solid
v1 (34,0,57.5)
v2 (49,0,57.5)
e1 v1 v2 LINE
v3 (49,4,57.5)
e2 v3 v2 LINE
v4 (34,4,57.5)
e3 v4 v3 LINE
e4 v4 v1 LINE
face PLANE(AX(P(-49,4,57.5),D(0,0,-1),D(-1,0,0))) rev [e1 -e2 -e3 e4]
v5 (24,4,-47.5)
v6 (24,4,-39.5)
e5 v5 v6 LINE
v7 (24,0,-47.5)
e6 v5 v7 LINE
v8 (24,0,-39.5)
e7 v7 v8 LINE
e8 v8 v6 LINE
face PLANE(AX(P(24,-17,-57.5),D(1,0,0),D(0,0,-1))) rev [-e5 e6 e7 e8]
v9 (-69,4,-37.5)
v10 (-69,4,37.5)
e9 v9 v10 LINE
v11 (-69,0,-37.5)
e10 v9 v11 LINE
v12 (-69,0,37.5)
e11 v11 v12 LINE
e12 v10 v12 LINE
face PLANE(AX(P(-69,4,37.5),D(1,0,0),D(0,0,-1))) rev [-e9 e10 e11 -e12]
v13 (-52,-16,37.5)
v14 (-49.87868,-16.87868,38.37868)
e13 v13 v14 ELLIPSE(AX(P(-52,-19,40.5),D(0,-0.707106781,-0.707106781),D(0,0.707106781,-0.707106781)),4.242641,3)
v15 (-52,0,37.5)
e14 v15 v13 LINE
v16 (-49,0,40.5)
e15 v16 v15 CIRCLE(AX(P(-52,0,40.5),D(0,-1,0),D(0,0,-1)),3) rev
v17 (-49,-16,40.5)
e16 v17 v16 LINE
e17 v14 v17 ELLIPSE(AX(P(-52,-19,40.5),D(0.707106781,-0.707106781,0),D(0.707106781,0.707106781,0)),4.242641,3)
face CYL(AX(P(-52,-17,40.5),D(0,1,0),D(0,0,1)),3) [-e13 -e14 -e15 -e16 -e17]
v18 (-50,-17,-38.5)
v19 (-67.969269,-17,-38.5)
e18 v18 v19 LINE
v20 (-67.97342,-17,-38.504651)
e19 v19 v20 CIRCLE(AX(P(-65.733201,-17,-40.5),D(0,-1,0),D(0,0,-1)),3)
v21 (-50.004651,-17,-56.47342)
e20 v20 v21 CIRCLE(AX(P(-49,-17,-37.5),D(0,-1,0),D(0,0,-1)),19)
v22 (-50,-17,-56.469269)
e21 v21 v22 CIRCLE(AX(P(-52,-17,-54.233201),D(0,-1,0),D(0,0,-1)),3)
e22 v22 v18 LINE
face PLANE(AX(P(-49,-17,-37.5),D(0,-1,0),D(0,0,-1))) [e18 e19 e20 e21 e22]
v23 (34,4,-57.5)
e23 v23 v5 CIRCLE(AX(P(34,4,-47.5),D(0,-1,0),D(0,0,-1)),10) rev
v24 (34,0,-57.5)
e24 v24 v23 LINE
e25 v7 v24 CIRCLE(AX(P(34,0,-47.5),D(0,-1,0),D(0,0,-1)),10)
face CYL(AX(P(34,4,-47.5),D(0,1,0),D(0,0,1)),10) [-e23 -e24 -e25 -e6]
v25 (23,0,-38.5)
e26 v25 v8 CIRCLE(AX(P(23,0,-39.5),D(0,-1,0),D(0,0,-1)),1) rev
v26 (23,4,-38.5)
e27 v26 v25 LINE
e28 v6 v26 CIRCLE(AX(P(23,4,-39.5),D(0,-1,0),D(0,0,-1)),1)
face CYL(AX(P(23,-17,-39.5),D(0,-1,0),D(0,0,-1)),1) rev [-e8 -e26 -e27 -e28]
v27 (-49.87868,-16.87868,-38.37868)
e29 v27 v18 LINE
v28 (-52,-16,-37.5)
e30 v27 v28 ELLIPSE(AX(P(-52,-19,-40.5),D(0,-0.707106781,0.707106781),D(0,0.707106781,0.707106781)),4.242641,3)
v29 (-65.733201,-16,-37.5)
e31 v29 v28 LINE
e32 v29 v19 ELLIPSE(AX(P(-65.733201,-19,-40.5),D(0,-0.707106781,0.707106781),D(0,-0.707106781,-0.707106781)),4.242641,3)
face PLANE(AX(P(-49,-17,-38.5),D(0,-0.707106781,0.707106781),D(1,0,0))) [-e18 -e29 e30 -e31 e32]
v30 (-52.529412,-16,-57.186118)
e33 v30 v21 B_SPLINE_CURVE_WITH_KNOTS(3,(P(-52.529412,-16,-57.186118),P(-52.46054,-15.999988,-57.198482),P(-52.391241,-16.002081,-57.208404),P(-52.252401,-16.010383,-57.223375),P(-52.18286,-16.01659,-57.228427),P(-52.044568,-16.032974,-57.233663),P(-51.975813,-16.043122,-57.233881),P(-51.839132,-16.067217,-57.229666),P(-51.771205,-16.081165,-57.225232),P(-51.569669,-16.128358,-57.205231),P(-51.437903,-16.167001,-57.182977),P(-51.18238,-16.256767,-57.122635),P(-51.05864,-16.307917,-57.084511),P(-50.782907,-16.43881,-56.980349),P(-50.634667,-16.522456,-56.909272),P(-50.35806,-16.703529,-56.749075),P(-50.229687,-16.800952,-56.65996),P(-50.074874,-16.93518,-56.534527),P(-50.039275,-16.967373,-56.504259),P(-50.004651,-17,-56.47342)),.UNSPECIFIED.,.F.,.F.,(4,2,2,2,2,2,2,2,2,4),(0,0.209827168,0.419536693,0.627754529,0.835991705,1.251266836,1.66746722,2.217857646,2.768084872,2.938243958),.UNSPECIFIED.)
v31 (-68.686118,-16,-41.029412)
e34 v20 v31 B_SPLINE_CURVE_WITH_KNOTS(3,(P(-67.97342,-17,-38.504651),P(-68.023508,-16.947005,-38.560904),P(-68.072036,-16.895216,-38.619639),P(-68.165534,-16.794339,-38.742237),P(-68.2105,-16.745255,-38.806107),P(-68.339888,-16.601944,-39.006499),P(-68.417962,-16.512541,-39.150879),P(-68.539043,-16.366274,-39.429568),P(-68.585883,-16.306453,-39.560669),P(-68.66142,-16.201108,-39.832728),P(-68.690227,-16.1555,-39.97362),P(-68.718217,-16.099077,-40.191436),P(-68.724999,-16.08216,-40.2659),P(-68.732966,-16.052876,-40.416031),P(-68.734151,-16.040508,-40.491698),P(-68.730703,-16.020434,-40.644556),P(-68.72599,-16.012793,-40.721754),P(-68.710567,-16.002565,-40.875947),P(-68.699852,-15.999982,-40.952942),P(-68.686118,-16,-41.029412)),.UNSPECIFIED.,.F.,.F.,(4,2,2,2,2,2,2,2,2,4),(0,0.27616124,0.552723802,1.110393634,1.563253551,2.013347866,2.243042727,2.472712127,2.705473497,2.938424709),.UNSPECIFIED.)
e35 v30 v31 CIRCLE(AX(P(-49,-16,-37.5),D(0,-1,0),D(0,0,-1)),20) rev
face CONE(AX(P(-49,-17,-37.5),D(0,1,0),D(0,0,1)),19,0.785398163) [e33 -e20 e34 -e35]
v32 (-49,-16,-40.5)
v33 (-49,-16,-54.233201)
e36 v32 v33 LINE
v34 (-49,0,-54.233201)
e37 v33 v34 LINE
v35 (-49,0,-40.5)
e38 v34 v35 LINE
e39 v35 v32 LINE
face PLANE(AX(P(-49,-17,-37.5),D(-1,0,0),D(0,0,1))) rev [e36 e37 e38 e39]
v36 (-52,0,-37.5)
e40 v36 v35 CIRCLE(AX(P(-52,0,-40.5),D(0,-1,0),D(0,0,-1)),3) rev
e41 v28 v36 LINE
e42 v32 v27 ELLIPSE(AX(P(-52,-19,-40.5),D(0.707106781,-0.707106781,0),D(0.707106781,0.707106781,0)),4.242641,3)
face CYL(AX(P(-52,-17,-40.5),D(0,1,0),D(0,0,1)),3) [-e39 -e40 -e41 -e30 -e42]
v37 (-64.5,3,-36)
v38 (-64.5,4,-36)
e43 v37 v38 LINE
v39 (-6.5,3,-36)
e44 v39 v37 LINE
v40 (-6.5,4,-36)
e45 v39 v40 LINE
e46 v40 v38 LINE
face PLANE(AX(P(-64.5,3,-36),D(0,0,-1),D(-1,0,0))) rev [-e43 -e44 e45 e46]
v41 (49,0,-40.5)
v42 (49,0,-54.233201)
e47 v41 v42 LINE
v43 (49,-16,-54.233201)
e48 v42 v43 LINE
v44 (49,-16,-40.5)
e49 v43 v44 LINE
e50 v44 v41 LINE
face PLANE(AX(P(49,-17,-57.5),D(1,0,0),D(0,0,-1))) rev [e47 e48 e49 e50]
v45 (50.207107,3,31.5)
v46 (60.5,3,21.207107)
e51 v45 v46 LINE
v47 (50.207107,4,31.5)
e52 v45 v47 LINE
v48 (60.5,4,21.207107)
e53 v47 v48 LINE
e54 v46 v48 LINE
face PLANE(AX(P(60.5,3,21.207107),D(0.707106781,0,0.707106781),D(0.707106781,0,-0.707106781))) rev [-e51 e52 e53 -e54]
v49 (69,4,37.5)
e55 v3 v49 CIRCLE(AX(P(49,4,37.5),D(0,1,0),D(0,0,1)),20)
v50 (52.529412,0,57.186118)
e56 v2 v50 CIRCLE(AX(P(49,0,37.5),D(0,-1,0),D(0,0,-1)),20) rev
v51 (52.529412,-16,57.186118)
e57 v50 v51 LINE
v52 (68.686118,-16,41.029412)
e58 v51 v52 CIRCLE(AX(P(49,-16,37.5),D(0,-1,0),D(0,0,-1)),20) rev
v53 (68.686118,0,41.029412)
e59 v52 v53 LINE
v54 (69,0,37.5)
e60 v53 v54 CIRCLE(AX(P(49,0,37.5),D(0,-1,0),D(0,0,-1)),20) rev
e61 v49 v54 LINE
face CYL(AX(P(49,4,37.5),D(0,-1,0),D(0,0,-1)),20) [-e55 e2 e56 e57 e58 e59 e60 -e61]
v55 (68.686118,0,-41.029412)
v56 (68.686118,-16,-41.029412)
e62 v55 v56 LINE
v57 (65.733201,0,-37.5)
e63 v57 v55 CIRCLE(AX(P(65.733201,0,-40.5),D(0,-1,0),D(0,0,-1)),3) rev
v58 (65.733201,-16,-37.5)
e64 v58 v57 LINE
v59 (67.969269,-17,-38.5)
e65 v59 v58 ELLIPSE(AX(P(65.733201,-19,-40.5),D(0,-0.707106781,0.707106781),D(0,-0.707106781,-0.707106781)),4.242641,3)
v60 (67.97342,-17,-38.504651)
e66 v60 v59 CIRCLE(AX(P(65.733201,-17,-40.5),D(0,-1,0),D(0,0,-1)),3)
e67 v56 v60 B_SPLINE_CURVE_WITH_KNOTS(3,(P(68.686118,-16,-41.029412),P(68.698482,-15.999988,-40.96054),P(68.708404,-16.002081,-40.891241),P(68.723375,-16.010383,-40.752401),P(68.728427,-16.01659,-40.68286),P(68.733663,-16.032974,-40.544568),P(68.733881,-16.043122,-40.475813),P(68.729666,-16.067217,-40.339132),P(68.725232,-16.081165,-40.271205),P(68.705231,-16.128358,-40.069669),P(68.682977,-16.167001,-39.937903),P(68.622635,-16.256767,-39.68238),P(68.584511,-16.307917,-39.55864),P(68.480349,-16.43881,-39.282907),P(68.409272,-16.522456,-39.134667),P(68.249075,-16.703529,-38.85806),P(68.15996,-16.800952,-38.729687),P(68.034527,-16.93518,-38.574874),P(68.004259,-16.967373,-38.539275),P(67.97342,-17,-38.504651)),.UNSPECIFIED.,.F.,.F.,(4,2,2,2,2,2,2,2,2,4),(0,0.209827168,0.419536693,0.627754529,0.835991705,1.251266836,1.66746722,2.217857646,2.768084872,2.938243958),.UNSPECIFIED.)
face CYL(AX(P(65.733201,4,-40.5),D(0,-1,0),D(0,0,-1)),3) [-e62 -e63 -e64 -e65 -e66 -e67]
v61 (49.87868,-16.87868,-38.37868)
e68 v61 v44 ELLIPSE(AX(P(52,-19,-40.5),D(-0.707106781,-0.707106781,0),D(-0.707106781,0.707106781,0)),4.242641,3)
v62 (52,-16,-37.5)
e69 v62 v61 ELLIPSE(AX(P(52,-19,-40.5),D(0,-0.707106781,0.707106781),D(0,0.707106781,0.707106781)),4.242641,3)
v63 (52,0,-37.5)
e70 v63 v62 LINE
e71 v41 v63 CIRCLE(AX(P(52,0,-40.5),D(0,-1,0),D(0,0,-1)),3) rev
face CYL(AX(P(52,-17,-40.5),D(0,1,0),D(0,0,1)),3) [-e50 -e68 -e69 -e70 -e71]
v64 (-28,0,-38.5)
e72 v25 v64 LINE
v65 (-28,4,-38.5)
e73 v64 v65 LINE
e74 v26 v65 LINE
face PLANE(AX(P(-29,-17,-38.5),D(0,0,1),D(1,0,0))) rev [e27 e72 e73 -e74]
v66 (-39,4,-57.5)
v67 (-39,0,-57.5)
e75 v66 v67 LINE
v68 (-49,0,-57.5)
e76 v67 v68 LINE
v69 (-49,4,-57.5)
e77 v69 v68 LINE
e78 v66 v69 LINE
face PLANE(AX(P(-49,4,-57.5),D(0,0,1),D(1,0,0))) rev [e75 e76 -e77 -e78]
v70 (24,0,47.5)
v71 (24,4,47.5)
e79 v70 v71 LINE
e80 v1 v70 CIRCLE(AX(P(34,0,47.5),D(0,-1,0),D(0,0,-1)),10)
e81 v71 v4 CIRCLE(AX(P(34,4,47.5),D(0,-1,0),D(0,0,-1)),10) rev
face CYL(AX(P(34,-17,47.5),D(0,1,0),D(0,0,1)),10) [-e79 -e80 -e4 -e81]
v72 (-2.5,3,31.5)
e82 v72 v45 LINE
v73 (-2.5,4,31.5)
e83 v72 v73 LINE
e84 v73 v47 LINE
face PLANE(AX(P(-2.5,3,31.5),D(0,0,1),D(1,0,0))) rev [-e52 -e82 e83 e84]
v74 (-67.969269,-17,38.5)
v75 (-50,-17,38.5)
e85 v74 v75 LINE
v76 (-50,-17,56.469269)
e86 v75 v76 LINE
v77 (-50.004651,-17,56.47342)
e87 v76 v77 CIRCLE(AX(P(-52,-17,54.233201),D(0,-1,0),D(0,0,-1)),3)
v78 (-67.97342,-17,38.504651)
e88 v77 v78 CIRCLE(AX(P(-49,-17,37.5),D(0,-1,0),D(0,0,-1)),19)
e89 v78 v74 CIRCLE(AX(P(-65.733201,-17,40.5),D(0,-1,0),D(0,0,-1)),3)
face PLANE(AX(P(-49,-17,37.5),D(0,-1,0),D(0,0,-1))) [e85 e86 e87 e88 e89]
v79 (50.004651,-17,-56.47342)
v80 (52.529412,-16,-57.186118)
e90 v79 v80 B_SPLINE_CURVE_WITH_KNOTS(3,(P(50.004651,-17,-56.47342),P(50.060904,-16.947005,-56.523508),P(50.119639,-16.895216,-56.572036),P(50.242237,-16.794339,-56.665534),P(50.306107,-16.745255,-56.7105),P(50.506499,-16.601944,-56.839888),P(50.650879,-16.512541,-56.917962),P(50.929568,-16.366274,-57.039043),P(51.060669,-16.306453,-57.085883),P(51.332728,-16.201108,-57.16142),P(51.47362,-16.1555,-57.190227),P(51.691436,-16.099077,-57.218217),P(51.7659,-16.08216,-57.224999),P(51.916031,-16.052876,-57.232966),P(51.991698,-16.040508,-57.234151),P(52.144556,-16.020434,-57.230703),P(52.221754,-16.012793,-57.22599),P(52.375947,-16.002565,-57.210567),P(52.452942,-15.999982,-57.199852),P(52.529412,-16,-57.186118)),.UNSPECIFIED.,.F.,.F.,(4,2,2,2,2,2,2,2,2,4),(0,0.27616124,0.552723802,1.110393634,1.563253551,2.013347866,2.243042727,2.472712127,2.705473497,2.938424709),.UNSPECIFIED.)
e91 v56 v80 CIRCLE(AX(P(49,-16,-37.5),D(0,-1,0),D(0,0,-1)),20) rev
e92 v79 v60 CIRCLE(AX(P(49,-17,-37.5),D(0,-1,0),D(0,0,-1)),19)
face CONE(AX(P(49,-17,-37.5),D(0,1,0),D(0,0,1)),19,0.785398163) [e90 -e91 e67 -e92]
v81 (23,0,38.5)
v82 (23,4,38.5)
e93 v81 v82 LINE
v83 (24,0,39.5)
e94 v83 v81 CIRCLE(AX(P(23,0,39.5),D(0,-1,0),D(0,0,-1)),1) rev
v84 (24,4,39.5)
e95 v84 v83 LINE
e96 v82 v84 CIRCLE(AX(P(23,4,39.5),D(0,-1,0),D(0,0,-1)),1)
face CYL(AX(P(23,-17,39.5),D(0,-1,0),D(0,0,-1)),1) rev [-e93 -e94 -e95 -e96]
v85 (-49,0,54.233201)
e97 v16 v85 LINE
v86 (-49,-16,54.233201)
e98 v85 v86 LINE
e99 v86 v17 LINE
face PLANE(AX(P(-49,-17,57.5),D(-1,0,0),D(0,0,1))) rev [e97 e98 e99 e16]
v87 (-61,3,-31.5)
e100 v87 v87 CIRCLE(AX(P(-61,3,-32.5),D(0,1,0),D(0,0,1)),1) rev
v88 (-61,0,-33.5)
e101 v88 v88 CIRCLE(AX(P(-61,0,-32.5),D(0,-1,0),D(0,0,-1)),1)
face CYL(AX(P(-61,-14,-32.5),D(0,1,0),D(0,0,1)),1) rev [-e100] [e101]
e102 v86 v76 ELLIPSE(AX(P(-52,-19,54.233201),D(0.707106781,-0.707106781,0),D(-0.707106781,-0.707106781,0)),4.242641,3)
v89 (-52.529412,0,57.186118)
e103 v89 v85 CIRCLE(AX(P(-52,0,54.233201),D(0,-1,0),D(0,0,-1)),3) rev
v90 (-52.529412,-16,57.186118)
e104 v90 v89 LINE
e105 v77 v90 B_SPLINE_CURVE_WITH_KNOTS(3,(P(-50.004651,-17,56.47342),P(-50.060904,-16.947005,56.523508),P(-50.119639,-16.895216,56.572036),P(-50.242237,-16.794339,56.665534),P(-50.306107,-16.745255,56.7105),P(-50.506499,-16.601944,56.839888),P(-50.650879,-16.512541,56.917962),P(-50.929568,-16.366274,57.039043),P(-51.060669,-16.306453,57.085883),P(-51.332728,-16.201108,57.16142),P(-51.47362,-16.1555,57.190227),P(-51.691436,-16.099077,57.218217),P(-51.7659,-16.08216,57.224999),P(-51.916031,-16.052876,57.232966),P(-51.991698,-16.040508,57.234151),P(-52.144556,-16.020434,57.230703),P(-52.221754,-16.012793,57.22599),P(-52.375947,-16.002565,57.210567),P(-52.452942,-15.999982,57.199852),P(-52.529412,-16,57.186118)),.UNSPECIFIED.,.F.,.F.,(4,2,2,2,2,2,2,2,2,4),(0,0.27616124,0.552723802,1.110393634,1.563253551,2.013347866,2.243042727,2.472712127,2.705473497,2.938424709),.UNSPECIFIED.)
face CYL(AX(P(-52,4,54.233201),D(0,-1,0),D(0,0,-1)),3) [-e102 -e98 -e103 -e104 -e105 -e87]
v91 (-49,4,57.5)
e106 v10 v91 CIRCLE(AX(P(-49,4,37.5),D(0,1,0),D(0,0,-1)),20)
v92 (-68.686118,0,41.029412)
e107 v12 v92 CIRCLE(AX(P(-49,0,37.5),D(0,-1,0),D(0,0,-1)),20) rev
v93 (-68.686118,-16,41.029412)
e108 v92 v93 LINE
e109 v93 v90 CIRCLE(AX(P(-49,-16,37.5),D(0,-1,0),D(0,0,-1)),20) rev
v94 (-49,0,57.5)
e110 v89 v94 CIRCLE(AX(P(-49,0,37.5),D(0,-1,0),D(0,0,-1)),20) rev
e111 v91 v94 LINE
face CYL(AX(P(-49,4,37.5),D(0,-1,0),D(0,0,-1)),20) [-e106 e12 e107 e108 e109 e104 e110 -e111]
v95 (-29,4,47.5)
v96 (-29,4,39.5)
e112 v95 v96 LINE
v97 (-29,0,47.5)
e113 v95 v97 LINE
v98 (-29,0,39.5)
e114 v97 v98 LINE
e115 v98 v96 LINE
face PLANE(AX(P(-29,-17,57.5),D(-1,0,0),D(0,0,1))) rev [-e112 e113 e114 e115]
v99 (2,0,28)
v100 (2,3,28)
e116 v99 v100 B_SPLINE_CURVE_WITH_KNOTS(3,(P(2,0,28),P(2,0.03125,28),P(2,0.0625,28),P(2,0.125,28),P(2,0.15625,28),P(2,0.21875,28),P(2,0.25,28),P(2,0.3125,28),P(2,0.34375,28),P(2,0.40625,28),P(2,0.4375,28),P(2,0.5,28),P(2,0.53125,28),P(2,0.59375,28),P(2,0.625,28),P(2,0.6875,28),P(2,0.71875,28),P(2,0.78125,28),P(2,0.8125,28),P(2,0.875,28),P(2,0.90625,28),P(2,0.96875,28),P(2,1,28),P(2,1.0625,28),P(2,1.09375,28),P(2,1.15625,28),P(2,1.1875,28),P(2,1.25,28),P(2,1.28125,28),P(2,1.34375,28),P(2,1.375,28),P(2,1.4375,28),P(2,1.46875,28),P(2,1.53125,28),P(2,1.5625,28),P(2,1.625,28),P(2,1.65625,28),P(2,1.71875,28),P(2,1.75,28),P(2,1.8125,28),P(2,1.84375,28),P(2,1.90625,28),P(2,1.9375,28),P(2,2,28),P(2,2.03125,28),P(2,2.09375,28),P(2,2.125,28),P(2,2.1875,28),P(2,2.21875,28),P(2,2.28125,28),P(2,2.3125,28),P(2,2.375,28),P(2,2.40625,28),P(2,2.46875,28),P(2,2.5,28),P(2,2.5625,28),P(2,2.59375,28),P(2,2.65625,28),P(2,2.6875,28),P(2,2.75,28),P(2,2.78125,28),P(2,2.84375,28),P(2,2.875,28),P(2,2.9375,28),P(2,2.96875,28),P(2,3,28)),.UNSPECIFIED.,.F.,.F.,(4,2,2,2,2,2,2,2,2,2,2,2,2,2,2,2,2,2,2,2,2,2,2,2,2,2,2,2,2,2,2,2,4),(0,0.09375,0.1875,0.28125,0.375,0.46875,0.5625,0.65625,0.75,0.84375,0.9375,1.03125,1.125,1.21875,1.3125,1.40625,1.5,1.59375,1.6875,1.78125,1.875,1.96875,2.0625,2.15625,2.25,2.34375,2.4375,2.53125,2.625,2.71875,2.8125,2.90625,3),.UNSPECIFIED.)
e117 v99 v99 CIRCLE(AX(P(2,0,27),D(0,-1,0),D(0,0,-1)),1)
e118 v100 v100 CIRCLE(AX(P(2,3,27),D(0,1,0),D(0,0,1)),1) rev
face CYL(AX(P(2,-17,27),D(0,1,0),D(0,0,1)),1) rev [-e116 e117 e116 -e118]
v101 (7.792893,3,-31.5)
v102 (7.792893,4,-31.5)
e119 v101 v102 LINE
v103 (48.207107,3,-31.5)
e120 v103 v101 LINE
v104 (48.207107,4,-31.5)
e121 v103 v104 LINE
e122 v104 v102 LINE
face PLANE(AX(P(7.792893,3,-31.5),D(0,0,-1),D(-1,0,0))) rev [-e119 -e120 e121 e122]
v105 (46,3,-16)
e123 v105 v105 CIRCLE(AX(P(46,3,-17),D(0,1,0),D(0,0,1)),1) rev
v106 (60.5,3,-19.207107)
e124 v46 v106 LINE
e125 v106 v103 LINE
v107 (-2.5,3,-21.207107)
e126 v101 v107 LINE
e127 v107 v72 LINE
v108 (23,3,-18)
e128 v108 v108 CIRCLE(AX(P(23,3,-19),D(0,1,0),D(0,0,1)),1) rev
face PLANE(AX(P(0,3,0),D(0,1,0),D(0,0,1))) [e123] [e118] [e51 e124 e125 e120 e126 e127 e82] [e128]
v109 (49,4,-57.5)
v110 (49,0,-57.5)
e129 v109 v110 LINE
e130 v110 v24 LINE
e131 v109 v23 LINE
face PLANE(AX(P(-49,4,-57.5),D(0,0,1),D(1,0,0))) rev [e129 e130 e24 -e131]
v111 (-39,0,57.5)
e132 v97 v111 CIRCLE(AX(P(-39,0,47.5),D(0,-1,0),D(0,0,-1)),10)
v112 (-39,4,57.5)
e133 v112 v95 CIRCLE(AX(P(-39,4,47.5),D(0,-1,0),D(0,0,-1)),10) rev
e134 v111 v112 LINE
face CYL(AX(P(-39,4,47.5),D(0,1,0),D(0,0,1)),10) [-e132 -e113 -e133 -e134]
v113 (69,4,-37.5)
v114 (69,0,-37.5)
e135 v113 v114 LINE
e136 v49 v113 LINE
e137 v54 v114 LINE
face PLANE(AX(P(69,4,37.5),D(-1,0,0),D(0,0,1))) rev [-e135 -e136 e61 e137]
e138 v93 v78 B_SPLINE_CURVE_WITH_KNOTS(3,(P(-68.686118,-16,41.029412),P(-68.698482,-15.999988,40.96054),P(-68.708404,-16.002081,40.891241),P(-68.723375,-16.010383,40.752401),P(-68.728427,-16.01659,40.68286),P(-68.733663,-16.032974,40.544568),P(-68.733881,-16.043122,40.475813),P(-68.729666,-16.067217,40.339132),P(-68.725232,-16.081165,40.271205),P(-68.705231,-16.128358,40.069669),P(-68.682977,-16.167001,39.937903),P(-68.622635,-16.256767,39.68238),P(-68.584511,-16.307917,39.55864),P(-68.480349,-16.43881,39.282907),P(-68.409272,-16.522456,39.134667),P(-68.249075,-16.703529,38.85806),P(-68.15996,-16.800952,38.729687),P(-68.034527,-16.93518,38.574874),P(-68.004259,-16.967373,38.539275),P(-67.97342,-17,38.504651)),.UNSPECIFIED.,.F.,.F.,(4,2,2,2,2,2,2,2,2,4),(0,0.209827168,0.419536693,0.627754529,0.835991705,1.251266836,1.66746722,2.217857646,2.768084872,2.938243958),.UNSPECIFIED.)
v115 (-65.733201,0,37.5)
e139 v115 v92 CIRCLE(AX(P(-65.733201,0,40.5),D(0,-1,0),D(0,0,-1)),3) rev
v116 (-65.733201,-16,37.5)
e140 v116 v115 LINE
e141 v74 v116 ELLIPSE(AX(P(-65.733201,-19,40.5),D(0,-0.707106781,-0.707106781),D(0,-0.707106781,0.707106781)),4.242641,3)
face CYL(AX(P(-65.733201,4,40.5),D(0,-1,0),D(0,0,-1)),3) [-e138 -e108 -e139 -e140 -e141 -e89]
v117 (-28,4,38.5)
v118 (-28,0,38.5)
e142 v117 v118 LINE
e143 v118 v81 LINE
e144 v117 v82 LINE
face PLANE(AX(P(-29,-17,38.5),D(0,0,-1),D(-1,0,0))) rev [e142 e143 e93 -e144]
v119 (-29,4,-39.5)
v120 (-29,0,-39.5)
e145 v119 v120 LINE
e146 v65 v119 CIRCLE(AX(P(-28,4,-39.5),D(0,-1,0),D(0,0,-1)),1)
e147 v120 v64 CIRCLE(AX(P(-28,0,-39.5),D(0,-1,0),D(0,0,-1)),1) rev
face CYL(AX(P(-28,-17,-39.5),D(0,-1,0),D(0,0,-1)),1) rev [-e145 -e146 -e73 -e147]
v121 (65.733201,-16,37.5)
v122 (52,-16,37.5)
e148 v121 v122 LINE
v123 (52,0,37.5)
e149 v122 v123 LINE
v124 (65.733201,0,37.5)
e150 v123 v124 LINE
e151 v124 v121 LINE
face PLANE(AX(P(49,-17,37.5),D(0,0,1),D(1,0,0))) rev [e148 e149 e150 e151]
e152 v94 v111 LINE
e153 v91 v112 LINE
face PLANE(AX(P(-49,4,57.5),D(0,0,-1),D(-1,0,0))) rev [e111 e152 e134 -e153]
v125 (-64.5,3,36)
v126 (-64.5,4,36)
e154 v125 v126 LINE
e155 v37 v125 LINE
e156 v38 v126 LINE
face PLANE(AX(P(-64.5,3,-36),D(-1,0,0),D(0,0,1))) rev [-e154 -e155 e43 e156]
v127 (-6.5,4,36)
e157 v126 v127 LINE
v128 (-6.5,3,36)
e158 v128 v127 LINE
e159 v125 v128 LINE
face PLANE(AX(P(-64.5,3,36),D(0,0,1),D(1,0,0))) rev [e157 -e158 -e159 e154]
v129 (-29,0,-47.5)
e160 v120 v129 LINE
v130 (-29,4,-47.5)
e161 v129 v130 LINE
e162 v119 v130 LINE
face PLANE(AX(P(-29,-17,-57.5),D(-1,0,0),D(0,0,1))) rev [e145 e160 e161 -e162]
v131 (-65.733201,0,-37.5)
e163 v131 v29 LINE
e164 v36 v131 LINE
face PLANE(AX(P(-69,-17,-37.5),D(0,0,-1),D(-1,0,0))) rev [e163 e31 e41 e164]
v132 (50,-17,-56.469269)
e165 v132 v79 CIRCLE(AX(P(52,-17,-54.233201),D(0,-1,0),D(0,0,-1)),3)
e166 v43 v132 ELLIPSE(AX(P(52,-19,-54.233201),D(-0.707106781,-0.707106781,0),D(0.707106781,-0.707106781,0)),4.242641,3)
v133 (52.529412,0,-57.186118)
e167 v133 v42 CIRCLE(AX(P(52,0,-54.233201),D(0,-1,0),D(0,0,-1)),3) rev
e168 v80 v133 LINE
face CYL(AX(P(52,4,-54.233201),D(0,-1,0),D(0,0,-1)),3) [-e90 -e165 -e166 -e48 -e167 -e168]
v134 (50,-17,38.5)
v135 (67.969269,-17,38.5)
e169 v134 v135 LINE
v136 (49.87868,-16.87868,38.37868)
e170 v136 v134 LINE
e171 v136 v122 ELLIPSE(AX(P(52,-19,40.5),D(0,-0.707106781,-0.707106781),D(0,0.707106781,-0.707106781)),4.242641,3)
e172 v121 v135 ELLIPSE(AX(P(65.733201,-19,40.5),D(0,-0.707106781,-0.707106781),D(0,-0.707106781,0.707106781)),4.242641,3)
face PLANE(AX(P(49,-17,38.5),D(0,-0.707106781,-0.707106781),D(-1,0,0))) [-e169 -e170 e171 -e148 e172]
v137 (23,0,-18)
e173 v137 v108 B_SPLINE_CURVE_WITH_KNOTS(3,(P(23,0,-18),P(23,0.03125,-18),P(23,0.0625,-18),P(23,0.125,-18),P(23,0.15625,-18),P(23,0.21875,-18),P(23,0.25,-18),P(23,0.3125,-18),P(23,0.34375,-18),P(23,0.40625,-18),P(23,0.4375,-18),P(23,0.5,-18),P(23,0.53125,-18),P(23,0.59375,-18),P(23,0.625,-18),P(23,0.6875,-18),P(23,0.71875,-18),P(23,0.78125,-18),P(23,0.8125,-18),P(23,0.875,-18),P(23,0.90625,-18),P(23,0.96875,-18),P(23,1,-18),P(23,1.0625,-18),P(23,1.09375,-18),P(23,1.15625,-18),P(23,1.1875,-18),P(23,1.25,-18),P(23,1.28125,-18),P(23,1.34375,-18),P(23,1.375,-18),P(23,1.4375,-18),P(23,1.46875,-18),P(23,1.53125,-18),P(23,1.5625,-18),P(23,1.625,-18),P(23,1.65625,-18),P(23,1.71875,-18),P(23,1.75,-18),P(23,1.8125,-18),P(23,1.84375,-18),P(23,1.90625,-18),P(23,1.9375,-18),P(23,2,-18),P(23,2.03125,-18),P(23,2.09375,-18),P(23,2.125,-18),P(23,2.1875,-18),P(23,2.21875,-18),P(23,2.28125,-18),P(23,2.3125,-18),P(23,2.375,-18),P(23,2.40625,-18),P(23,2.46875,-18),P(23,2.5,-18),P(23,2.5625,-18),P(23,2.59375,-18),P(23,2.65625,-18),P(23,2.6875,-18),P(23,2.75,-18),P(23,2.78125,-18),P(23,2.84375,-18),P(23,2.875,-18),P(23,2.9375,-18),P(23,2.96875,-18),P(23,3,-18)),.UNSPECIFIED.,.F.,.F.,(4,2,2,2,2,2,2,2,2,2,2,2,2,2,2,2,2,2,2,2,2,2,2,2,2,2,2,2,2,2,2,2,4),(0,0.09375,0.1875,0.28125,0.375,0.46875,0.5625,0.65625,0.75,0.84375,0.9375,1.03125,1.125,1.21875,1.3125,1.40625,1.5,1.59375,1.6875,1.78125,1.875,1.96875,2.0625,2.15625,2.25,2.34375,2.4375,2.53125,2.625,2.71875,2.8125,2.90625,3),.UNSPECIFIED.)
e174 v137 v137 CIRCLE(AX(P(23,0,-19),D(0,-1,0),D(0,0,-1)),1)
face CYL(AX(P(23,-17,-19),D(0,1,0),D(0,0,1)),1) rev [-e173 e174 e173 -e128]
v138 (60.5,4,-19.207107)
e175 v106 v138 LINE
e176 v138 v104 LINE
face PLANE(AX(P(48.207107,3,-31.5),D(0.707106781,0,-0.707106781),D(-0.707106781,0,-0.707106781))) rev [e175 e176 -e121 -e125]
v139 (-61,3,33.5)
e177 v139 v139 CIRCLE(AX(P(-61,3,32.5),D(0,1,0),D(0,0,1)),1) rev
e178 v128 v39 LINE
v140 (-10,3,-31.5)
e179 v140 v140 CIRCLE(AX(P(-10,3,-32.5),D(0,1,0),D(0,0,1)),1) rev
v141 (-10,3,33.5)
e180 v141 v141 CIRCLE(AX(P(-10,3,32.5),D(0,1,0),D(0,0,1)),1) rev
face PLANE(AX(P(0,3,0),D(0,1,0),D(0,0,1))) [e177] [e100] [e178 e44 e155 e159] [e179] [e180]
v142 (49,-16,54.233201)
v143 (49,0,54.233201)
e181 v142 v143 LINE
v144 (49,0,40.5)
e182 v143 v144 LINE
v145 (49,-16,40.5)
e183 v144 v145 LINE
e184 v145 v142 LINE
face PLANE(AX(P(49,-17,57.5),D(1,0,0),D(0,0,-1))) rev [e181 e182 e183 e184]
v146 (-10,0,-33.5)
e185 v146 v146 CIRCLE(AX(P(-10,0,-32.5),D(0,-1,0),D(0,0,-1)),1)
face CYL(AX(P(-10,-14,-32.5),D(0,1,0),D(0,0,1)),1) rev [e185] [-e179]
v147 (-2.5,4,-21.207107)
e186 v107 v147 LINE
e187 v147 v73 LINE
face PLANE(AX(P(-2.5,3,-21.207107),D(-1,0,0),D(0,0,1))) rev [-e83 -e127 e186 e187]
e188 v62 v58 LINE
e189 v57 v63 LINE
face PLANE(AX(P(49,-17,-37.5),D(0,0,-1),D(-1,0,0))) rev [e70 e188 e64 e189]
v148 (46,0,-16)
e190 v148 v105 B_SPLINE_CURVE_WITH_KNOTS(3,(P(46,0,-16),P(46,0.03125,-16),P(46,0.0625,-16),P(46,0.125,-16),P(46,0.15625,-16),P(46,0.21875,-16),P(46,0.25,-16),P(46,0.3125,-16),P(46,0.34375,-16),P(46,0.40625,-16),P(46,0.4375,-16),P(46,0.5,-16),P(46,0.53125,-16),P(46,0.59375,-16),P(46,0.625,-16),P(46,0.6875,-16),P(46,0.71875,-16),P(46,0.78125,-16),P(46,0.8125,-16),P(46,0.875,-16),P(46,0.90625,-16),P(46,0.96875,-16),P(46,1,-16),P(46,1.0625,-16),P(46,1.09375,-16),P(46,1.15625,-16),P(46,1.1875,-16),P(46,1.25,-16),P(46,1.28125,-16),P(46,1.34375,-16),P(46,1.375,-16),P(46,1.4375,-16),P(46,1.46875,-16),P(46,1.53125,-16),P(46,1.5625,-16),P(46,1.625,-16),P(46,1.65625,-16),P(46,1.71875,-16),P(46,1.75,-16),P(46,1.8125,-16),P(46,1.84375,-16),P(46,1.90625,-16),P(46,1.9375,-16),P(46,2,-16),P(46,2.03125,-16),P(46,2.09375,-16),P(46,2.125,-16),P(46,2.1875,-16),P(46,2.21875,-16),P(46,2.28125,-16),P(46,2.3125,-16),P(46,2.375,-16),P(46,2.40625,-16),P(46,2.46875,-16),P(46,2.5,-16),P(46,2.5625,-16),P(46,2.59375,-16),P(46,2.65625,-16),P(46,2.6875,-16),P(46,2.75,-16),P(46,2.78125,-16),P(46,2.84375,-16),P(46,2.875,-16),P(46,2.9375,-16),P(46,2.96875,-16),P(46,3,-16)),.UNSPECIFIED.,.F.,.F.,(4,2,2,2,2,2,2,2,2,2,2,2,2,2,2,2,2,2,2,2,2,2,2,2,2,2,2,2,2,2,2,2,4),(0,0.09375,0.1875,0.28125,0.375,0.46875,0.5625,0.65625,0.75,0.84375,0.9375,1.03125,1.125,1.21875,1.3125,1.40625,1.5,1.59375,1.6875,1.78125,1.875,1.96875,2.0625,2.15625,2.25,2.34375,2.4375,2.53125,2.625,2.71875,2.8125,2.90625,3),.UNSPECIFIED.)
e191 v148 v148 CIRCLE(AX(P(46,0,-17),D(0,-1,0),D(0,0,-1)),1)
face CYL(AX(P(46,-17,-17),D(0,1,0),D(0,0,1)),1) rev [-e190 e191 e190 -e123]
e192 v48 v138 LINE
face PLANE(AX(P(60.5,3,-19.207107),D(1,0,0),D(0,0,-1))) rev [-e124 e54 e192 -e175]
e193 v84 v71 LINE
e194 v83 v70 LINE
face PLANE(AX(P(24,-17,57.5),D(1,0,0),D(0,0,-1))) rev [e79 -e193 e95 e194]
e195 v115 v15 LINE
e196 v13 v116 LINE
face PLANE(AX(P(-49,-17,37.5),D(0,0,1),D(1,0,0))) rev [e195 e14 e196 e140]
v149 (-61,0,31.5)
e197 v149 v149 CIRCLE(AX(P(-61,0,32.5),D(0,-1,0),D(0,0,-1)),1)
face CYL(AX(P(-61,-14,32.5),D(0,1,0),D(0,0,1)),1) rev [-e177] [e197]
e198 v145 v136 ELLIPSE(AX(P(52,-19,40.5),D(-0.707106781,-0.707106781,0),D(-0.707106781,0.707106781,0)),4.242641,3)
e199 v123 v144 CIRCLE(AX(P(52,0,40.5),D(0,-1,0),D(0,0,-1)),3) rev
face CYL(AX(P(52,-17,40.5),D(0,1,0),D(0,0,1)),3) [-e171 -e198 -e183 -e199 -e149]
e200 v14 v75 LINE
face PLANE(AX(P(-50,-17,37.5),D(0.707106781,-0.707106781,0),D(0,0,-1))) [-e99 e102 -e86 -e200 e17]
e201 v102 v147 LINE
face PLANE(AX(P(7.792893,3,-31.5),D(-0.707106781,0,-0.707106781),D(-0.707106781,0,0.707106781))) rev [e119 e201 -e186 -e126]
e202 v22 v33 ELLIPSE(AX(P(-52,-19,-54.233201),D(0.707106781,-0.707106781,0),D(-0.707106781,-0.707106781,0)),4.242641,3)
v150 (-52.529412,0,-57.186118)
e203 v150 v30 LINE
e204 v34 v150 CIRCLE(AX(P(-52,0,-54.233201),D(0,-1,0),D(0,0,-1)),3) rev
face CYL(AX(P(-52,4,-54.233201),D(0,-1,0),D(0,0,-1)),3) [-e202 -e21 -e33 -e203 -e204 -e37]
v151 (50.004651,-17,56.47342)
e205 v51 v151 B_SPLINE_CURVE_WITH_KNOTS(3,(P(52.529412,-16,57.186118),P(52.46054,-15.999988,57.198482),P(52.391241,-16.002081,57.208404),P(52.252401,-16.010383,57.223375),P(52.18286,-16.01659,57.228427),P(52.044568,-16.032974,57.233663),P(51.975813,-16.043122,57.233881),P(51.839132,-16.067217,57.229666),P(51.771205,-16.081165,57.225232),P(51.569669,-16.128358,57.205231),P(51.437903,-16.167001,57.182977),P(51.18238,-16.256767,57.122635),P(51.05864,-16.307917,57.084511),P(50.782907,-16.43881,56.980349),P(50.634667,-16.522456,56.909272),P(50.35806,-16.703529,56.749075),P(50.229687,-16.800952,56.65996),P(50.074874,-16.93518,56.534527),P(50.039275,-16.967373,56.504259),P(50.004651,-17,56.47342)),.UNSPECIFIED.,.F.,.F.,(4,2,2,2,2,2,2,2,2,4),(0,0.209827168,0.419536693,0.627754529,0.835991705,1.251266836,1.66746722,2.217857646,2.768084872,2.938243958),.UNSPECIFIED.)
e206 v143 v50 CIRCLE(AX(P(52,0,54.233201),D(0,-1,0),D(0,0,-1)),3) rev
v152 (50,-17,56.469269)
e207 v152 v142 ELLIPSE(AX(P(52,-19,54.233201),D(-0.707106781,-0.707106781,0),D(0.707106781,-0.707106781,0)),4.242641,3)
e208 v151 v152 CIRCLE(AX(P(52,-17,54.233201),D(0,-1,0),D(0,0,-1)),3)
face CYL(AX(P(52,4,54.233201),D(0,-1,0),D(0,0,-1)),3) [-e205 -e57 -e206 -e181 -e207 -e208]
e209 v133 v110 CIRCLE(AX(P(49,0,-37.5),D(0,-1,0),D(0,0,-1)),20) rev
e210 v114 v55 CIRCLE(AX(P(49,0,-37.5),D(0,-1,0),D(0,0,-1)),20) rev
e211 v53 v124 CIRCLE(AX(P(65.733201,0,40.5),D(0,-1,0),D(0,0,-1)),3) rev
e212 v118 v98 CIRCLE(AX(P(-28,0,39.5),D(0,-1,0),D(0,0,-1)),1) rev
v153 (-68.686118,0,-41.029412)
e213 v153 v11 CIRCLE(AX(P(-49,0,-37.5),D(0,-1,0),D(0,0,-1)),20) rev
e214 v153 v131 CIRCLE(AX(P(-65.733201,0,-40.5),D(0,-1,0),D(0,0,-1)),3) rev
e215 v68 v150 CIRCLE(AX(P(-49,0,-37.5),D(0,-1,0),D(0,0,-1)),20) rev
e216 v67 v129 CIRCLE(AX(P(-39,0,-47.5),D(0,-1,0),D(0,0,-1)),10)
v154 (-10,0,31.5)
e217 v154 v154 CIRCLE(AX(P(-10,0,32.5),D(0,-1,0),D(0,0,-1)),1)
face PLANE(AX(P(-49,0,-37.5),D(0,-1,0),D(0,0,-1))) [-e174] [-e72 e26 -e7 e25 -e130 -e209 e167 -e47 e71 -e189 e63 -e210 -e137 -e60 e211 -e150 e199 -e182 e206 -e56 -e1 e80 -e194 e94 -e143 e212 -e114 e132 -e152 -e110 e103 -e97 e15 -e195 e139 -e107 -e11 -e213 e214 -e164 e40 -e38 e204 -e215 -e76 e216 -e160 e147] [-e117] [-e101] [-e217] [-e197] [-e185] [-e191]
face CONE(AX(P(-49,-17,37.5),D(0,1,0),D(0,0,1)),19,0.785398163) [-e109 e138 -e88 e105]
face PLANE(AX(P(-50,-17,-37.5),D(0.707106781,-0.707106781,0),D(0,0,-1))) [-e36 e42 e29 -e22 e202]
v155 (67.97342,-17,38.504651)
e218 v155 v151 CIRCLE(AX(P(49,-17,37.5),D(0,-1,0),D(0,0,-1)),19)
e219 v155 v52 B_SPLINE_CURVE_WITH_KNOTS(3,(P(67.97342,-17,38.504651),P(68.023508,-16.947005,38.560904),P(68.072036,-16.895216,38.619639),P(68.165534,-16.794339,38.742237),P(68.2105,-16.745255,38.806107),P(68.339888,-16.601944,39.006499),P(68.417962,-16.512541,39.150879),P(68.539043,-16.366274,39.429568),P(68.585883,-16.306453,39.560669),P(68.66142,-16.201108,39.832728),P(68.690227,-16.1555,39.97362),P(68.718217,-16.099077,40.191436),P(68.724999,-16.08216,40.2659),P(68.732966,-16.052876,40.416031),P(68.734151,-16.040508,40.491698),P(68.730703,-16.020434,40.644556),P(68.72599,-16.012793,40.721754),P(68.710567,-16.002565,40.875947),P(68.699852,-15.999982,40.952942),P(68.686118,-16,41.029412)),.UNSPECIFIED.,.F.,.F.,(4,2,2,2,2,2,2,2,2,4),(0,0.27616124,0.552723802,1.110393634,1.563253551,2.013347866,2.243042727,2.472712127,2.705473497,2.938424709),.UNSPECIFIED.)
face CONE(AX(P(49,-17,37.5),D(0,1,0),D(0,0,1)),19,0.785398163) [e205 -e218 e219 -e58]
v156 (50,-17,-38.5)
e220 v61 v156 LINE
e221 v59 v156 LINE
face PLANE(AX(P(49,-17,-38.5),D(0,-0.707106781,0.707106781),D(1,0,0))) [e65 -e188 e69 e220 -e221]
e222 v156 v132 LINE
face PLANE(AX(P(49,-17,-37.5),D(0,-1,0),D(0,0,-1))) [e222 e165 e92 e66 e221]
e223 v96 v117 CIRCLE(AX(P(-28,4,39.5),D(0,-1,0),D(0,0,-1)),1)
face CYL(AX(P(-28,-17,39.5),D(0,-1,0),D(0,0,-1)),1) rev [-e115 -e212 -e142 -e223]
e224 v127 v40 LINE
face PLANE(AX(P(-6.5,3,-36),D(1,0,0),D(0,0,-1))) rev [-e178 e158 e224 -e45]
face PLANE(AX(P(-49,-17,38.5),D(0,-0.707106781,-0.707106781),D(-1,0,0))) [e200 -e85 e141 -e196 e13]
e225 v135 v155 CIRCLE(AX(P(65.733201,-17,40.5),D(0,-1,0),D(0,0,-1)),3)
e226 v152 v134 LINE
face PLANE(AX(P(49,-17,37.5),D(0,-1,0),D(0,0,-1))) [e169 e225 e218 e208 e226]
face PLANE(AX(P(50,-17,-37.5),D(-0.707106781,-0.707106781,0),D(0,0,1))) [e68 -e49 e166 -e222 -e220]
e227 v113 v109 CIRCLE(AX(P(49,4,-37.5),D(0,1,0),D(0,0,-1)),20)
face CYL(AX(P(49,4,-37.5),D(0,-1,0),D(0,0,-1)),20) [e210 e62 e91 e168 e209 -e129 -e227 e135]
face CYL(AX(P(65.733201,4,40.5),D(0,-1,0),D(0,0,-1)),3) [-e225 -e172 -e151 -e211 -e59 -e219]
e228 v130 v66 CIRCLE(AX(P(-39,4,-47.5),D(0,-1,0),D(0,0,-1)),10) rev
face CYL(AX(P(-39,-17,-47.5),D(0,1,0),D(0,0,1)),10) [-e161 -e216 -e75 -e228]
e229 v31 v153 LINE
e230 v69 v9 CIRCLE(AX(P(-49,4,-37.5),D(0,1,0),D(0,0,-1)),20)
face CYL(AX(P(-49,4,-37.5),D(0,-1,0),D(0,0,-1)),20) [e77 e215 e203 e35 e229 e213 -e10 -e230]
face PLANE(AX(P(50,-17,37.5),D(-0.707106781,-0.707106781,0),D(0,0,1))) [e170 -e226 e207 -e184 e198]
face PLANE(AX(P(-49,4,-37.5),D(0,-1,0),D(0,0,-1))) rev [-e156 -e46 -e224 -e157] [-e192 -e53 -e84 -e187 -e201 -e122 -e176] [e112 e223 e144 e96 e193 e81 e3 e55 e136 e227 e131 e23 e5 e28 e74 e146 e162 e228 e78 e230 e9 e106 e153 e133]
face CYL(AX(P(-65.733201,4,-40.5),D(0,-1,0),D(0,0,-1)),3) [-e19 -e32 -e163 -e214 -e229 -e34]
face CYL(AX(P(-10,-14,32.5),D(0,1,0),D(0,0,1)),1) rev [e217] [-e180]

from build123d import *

# Parameters (mm, degrees)
TABLE_DEPTH                  = 4
PIEDS_START                  = 17
PIEDS_DEPTH                  = 17
ENL_V_MAT_EXTRU_3_DEPTH      = 93.240175629
ENL_V_MAT_EXTRU_3_DEPTH_BACK = 93.240175629
ESQUISSE5_W                  = 5
ESQUISSE5_H                  = 18
ENL_V_MAT_EXTRU_4_DEPTH      = 93.240175629
ENL_V_MAT_EXTRU_4_DEPTH_BACK = 93.240175629
ESQUISSE6_W                  = 43
ESQUISSE6_H                  = 18
CONG_1_R                     = 10
CHANFREIN1_SIZE              = 1
CONG_2_R                     = 3
ESQUISSE3_R                  = 1
ENL_V_MAT_EXTRU_5_DEPTH      = 18
ENL_V_MAT_EXTRU_6_DEPTH      = 93.240175629
ENL_V_MAT_EXTRU_6_DEPTH_BACK = 93.240175629
ESQUISSE4_R                  = 1
ESQUISSE8_W                  = 58
ESQUISSE8_H                  = 72
ENL_V_MAT_EXTRU_7_DEPTH      = 1
ENL_V_MAT_EXTRU_8_DEPTH      = 1
ENL_V_MAT_EXTRU_9_DEPTH      = 93.240175629
ENL_V_MAT_EXTRU_9_DEPTH_BACK = 93.240175629
ESQUISSE11_W                 = 53
ESQUISSE11_H                 = 1
CONG_3_R                     = 1
CONG_4_R                     = 3


with BuildPart() as part:
    # Esquisse1 → table (new body)
    with BuildSketch(Plane(origin=(0, 0, 0), x_dir=(1, 0, 0), z_dir=(0, 1, 0))):
        with BuildLine():
            Line((-49, -57.5), (49, -57.5))
            ThreePointArc((49, -57.5), (63.142135624, -51.642135624), (69, -37.5))
            Line((69, -37.5), (69, 37.5))
            ThreePointArc((69, 37.5), (63.142135624, 51.642135624), (49, 57.5))
            Line((49, 57.5), (-49, 57.5))
            ThreePointArc((-49, 57.5), (-63.142135624, 51.642135624), (-69, 37.5))
            Line((-69, 37.5), (-69, -37.5))
            ThreePointArc((-69, -37.5), (-63.142135624, -51.642135624), (-49, -57.5))
        make_face()
    extrude(amount=TABLE_DEPTH)

    # Esquisse2 → pieds (add)
    with BuildSketch(Plane.XZ.offset(PIEDS_START)):
        with BuildLine():
            Line((-49, 57.5), (-49, 37.5))
            Line((-49, 37.5), (-69, 37.5))
            ThreePointArc((-69, 37.5), (-63.142135624, 51.642135624), (-49, 57.5))
        make_face()
        with BuildLine():
            Line((-69, -37.5), (-49, -37.5))
            Line((-49, -37.5), (-49, -57.5))
            ThreePointArc((-49, -57.5), (-63.142135624, -51.642135624), (-69, -37.5))
        make_face()
        with BuildLine():
            Line((49, -57.5), (49, -37.5))
            Line((49, -37.5), (69, -37.5))
            ThreePointArc((69, -37.5), (63.142135624, -51.642135624), (49, -57.5))
        make_face()
        with BuildLine():
            Line((49, 57.5), (49, 37.5))
            Line((49, 37.5), (69, 37.5))
            ThreePointArc((69, 37.5), (63.142135624, 51.642135624), (49, 57.5))
        make_face()
    extrude(amount=-PIEDS_DEPTH)

    # Esquisse5 → Enlèv. mat.-Extru.3 (cut, two sides: drawn at the far end of the back side and taken through both)
    with BuildSketch(Plane(origin=(0, 4, 0), x_dir=(1, 0, 0), z_dir=(0, 1, 0)).offset(-ENL_V_MAT_EXTRU_3_DEPTH_BACK)):
        with Locations((-26.5, 48.5)):
            Rectangle(ESQUISSE5_W, ESQUISSE5_H)
        with Locations((21.5, 48.5)):
            Rectangle(ESQUISSE5_W, ESQUISSE5_H)
        with Locations((-26.5, -48.5)):
            Rectangle(ESQUISSE5_W, ESQUISSE5_H)
        with Locations((21.5, -48.5)):
            Rectangle(ESQUISSE5_W, ESQUISSE5_H)
    extrude(amount=ENL_V_MAT_EXTRU_3_DEPTH + ENL_V_MAT_EXTRU_3_DEPTH_BACK, mode=Mode.SUBTRACT)

    # Esquisse6 → Enlèv. mat.-Extru.4 (cut, two sides: drawn at the far end of the back side and taken through both)
    with BuildSketch(Plane(origin=(0, 4, 0), x_dir=(1, 0, 0), z_dir=(0, 1, 0)).offset(-ENL_V_MAT_EXTRU_4_DEPTH_BACK)):
        with Locations((-2.5, 48.5)):
            Rectangle(ESQUISSE6_W, ESQUISSE6_H)
        with Locations((-2.5, -48.5)):
            Rectangle(ESQUISSE6_W, ESQUISSE6_H)
    extrude(amount=ENL_V_MAT_EXTRU_4_DEPTH + ENL_V_MAT_EXTRU_4_DEPTH_BACK, mode=Mode.SUBTRACT)

    # Congé1
    cong_1_edges = [part.edges().sort_by_distance(p)[0] for p in [
        (24, 2, 57.5),
        (-29, 2, -57.5),
        (24, 2, -57.5),
        (-29, 2, 57.5),
    ]]
    fillet(cong_1_edges, radius=CONG_1_R)

    # Chanfrein1
    chanfrein1_edges = [part.edges().sort_by_distance(p)[0] for p in [
        (59, -17, -37.5),
        (49, -17, -47.5),
        (63.142135624, -17, -51.642135624),
        (-49, -17, -47.5),
        (-59, -17, -37.5),
        (-63.142135624, -17, -51.642135624),
        (-59, -17, 37.5),
        (-49, -17, 47.5),
        (-63.142135624, -17, 51.642135624),
        (59, -17, 37.5),
        (63.142135624, -17, 51.642135624),
        (49, -17, 47.5),
    ]]
    chamfer(chanfrein1_edges, length=CHANFREIN1_SIZE)

    # Congé2
    cong_2_edges = [part.edges().sort_by_distance(p)[0] for p in [
        (49, -8, 37.5),
        (49, -8, -37.5),
        (-49, -8, -37.5),
        (-49, -8, 37.5),
    ]]
    fillet(cong_2_edges, radius=CONG_2_R)

    # Esquisse3 → Enlèv. mat.-Extru.5 (cut)
    with BuildSketch(Plane(origin=(0, 4, 0), x_dir=(1, 0, 0), z_dir=(0, 1, 0))):
        with Locations(Location((-10, -32.5, 0), (0, 0, 270))):
            Circle(ESQUISSE3_R)
        with Locations(Location((-61, -32.5, 0), (0, 0, 270))):
            Circle(ESQUISSE3_R)
        with Locations(Location((-61, 32.5, 0), (0, 0, 270))):
            Circle(ESQUISSE3_R)
        with Locations(Location((-10, 32.5, 0), (0, 0, 270))):
            Circle(ESQUISSE3_R)
    extrude(amount=-ENL_V_MAT_EXTRU_5_DEPTH, mode=Mode.SUBTRACT)

    # Esquisse4 → Enlèv. mat.-Extru.6 (cut, two sides: drawn at the far end of the back side and taken through both)
    with BuildSketch(Plane(origin=(0, 4, 0), x_dir=(1, 0, 0), z_dir=(0, 1, 0)).offset(-ENL_V_MAT_EXTRU_6_DEPTH_BACK)):
        with Locations(Location((2, -27, 0), (0, 0, 270))):
            Circle(ESQUISSE4_R)
        with Locations(Location((46, 17, 0), (0, 0, 270))):
            Circle(ESQUISSE4_R)
        with Locations(Location((23, 19, 0), (0, 0, 270))):
            Circle(ESQUISSE4_R)
    extrude(amount=ENL_V_MAT_EXTRU_6_DEPTH + ENL_V_MAT_EXTRU_6_DEPTH_BACK, mode=Mode.SUBTRACT)

    # Esquisse8 → Enlèv. mat.-Extru.7 (cut)
    with BuildSketch(Plane(origin=(0, 4, 0), x_dir=(1, 0, 0), z_dir=(0, 1, 0))):
        with Locations((-35.5, 0)):
            Rectangle(ESQUISSE8_W, ESQUISSE8_H)
    extrude(amount=-ENL_V_MAT_EXTRU_7_DEPTH, mode=Mode.SUBTRACT)

    # Esquisse10 → Enlèv. mat.-Extru.8 (cut)
    with BuildSketch(Plane(origin=(0, 4, 0), x_dir=(1, 0, 0), z_dir=(0, 1, 0))):
        Polygon((-2.5, -31.5), (50.207106781, -31.5), (60.5, -21.207106781), (60.5, 19.207106781), (48.207106781, 31.5), (7.792893219, 31.5), (-2.5, 21.207106781), align=None)
    extrude(amount=-ENL_V_MAT_EXTRU_8_DEPTH, mode=Mode.SUBTRACT)

    # Esquisse11 → Enlèv. mat.-Extru.9 (cut, two sides: drawn at the far end of the back side and taken through both)
    with BuildSketch(Plane(origin=(0, 4, 0), x_dir=(1, 0, 0), z_dir=(0, 1, 0)).offset(-ENL_V_MAT_EXTRU_9_DEPTH_BACK)):
        with Locations((-2.5, 39)):
            Rectangle(ESQUISSE11_W, ESQUISSE11_H)
        with Locations((-2.5, -39)):
            Rectangle(ESQUISSE11_W, ESQUISSE11_H)
    extrude(amount=ENL_V_MAT_EXTRU_9_DEPTH + ENL_V_MAT_EXTRU_9_DEPTH_BACK, mode=Mode.SUBTRACT)

    # Congé3
    cong_3_edges = [part.edges().sort_by_distance(p)[0] for p in [
        (24, 2, -38.5),
        (-29, 2, -38.5),
        (-29, 2, 38.5),
        (24, 2, 38.5),
    ]]
    fillet(cong_3_edges, radius=CONG_3_R)

    # Congé4
    # the kernel refuses this fillet: 3 mm, written as the material it takes off along each edge
    with BuildSketch(Plane(origin=(69, -24.858353806, 37.5), x_dir=(-1, 0, 0), z_dir=(0, 1, 0)), Plane(origin=(-69, -24.858353806, -37.5), x_dir=(1, 0, 0), z_dir=(0, 1, 0)), Plane(origin=(49, -24.858353806, -57.5), x_dir=(0, 0, 1), z_dir=(0, 1, 0)), Plane(origin=(-49, -24.858353806, 57.5), x_dir=(0, 0, -1), z_dir=(0, 1, 0))) as cong_4_piece_1:
        with BuildLine():
            CenterArc((3.266799469, 3), CONG_4_R, 169.835751378, 100.164248622)
            ThreePointArc((0.313881729, 3.529411765), (0.078624979, 1.771670761), (0, 0))
            Line((0, 0), (3.266799469, 0))
        make_face()
    extrude(amount=24.858353806, mode=Mode.SUBTRACT)
    with BuildSketch(Plane(origin=(-49, -24.858353806, -57.5), x_dir=(0, 0, 1), z_dir=(0, 1, 0)), Plane(origin=(-69, -24.858353806, 37.5), x_dir=(1, 0, 0), z_dir=(0, 1, 0)), Plane(origin=(69, -24.858353806, -37.5), x_dir=(-1, 0, 0), z_dir=(0, 1, 0)), Plane(origin=(49, -24.858353806, 57.5), x_dir=(0, 0, -1), z_dir=(0, 1, 0))) as cong_4_piece_2:
        with BuildLine():
            CenterArc((3.266799469, -3), CONG_4_R, 90, 100.164248622)
            ThreePointArc((0.313881729, -3.529411765), (0.078624979, -1.771670761), (0, 0))
            Line((0, 0), (3.266799469, 0))
        make_face()
    extrude(amount=24.858353806, mode=Mode.SUBTRACT)


solid = part.part
